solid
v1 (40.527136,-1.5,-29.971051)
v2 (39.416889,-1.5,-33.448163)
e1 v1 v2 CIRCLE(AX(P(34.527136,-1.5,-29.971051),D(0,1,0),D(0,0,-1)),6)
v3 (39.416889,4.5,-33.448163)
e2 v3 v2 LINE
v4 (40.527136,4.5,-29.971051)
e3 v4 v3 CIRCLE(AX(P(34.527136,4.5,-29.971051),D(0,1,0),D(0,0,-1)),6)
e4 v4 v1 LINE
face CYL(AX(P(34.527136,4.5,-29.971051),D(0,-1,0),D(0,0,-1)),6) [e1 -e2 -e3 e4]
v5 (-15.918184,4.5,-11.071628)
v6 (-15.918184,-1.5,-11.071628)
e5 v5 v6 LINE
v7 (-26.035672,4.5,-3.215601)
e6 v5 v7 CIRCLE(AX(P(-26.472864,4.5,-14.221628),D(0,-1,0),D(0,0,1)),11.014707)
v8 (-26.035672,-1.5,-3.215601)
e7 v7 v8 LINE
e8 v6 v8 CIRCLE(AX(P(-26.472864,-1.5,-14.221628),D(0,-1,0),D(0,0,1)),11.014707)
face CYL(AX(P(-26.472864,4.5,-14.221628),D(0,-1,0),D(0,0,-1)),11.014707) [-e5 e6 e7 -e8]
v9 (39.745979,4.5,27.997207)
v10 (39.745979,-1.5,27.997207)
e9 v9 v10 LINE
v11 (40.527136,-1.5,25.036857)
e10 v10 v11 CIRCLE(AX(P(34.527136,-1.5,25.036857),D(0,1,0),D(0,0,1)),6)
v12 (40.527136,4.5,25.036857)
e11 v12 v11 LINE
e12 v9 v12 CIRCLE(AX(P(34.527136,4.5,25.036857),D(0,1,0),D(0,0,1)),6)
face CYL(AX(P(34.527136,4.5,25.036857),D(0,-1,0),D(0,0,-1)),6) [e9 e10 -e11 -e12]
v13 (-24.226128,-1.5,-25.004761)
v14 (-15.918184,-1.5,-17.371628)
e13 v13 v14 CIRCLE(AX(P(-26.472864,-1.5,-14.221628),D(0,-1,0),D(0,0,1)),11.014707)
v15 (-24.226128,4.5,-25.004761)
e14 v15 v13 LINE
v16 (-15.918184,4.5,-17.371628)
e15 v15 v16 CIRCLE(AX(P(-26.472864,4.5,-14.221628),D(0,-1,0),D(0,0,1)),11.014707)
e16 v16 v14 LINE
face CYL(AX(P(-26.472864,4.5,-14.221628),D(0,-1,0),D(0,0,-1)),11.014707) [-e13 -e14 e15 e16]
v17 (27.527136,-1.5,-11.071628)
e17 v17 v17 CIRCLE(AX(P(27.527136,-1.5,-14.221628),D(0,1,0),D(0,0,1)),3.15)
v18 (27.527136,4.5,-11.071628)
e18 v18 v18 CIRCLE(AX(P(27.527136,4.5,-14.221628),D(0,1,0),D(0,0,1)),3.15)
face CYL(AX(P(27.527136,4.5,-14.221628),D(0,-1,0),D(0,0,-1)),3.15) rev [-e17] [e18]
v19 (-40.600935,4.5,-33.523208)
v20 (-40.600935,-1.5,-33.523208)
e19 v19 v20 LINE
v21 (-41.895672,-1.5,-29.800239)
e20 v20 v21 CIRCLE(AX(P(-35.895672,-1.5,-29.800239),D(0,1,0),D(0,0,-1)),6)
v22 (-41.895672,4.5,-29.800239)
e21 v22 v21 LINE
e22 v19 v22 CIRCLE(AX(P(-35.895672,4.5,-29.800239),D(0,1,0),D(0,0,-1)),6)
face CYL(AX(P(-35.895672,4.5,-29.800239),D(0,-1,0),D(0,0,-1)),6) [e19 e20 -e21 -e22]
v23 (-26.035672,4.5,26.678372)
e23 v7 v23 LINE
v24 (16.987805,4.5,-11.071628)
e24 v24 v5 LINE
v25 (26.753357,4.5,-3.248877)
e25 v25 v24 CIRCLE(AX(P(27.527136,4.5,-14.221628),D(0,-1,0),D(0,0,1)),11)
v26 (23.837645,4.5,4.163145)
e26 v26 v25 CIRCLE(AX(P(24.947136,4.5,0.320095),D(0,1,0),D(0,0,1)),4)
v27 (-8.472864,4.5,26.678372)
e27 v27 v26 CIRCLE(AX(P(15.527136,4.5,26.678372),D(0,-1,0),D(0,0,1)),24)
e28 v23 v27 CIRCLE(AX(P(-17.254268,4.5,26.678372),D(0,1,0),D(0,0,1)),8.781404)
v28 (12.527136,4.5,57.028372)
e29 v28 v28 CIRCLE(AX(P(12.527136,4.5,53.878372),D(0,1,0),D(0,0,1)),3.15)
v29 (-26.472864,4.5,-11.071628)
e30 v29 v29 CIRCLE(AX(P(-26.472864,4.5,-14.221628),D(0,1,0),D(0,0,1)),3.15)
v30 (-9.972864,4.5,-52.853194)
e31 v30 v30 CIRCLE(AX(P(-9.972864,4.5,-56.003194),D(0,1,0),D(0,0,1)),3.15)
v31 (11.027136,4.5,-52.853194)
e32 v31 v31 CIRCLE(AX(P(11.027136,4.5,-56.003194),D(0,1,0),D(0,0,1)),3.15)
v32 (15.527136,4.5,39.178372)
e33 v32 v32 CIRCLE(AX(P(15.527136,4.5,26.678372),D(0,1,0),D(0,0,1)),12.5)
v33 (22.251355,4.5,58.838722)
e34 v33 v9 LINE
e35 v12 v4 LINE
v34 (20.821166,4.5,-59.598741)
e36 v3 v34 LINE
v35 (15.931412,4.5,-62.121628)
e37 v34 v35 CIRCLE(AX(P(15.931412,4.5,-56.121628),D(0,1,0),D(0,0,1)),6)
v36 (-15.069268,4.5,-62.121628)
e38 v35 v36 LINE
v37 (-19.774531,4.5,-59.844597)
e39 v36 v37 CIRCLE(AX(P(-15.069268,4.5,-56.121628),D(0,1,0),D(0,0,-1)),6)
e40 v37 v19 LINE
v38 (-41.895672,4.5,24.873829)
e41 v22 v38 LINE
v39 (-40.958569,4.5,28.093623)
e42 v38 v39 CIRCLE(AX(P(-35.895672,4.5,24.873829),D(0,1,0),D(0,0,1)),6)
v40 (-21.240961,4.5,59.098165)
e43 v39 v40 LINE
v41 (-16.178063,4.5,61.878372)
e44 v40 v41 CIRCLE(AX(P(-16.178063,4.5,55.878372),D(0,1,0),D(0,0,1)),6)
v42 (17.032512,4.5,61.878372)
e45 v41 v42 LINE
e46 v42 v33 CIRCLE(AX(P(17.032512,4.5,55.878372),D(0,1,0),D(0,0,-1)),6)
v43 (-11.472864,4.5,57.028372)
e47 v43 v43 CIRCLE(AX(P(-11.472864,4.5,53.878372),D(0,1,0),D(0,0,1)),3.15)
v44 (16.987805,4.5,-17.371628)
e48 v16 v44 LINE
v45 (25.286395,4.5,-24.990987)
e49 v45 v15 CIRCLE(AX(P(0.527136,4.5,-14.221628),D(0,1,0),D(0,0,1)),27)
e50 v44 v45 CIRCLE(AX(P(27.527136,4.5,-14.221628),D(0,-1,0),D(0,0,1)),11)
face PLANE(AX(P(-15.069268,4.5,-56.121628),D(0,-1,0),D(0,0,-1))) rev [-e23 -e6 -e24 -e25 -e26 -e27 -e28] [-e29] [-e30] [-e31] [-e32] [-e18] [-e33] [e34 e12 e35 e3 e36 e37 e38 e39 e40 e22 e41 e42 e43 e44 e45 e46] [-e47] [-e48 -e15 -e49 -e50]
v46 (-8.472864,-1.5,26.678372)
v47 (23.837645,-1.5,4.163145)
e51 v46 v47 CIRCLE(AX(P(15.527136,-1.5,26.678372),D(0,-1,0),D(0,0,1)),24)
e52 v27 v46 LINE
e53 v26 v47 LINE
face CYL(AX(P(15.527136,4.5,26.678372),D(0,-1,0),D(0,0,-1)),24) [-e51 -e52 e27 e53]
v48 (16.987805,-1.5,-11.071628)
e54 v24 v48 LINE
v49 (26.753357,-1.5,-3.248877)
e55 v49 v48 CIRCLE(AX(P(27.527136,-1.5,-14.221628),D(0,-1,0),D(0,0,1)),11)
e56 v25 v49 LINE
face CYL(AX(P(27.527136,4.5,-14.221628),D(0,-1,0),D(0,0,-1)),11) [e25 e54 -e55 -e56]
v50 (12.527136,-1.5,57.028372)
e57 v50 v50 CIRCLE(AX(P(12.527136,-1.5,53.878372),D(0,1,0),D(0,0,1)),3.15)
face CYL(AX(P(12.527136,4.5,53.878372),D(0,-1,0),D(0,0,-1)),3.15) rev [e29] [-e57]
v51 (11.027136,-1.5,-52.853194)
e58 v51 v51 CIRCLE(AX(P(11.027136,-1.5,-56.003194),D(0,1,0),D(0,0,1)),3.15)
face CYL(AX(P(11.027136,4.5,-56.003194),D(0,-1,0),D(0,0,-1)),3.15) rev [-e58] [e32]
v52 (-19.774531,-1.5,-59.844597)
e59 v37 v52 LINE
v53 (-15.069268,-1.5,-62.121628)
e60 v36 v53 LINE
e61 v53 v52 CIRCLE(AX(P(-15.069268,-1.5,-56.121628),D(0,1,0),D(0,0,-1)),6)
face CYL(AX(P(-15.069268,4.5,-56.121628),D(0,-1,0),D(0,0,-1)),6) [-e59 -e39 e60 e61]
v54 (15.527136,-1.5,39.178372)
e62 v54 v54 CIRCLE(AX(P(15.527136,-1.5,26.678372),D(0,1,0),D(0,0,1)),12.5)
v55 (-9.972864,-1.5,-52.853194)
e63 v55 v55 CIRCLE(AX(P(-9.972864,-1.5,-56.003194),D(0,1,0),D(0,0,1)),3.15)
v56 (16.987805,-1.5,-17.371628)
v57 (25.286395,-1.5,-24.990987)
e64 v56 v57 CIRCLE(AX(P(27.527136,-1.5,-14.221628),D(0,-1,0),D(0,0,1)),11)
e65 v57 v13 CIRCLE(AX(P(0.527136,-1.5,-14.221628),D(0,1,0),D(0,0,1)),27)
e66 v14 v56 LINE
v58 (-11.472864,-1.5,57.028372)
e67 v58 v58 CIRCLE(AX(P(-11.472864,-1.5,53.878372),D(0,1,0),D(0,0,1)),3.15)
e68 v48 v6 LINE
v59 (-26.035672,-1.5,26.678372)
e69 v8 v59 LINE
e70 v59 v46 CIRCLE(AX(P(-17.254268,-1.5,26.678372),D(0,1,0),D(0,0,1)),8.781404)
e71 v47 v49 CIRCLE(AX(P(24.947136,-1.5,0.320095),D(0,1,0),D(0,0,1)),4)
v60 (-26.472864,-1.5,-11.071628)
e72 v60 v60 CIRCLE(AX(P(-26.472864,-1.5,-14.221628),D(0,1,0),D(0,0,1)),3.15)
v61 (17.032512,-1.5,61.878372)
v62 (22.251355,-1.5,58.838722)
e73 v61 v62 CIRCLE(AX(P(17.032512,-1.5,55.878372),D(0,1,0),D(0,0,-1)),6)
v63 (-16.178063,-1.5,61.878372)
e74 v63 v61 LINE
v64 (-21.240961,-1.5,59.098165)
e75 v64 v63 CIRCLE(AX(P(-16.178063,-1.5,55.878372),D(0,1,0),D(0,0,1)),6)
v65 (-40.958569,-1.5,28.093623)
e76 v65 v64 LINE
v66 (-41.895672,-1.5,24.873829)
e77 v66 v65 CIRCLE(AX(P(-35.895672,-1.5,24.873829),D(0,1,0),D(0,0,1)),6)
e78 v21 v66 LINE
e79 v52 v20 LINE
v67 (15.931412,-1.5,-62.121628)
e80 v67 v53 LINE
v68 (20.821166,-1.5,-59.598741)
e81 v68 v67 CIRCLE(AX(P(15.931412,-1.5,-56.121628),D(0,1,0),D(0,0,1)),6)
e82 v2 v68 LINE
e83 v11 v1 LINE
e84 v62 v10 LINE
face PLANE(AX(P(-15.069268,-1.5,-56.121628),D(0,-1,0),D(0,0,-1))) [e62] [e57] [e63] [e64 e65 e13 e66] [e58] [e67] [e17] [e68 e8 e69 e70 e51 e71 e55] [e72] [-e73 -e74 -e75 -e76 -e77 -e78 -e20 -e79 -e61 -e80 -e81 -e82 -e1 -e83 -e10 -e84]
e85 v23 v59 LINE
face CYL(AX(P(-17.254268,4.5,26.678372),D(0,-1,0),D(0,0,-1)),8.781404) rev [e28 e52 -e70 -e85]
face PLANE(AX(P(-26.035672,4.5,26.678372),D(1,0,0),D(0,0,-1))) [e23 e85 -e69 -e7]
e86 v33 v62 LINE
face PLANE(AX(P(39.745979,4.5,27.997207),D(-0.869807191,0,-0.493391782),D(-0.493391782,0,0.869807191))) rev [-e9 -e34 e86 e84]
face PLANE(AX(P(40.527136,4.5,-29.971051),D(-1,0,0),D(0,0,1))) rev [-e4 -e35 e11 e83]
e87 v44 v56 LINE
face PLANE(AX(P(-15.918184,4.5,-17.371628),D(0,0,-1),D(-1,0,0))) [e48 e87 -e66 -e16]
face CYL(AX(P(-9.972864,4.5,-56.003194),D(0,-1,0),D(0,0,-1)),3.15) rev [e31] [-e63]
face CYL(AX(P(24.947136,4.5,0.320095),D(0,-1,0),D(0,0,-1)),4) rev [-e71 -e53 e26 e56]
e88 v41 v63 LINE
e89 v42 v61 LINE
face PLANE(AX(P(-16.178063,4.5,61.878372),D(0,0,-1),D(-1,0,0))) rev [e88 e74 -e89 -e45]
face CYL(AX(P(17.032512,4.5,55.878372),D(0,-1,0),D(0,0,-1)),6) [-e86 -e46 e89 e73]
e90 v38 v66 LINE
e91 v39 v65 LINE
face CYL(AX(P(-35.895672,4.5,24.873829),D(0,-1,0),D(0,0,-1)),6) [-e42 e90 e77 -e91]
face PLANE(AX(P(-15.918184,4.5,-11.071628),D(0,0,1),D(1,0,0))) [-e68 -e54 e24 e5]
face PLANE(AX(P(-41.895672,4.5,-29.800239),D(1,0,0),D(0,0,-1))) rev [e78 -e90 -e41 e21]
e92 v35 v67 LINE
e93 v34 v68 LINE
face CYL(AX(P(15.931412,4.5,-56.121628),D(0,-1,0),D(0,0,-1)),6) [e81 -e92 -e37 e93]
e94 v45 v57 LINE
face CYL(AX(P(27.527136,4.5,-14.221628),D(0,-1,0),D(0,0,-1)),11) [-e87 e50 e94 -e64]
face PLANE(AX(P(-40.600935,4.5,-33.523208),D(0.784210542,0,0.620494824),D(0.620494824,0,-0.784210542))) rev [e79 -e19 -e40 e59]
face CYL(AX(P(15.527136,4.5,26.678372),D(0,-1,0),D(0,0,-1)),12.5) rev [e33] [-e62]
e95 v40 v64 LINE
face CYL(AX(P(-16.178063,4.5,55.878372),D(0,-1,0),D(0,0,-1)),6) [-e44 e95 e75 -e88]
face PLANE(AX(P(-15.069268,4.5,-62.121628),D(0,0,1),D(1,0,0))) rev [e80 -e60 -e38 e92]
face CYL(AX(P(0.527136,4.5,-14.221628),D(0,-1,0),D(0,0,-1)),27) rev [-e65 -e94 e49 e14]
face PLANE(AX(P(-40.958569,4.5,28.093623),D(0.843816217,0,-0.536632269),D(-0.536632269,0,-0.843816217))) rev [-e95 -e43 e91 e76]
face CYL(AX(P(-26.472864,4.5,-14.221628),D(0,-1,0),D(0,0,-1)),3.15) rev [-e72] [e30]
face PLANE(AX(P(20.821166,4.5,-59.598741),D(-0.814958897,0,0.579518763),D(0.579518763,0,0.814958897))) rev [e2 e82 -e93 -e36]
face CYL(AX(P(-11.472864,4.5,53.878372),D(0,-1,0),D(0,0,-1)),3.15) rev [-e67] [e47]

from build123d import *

# Parameters (mm, degrees)
SKETCH1_R          = 6.25
SKETCH1_R_2        = 1.575
BASE_FLANGE1_DEPTH = 3
L_EK1_SCALE        = 2


# Sheet-metal steps are written as plain solids
with BuildPart() as part:
    # Sketch1 → Base-Flange1 (new body)
    with BuildSketch(Plane(origin=(0, 0, 0), x_dir=(1, 0, 0), z_dir=(0, 1, 0))):
        with BuildLine():
            Line((19.609421573, -14.059417906), (10.862109445, -29.480175346))
            ThreePointArc((10.862109445, -29.480175346), (9.762567662, -30.59234701), (8.252687872, -31))
            Line((8.252687872, -31), (-8.352599575, -31))
            ThreePointArc((-8.352599575, -31), (-9.796606082, -30.629609326), (-10.884048227, -29.609896806))
            Line((-10.884048227, -29.609896806), (-20.742852548, -14.107625594))
            ThreePointArc((-20.742852548, -14.107625594), (-21.091885276, -13.336076582), (-21.211403896, -12.497728788))
            Line((-21.211403896, -12.497728788), (-21.211403896, 14.839305313))
            ThreePointArc((-21.211403896, 14.839305313), (-21.044943633, 15.824725306), (-20.564035521, 16.700789784))
            Line((-20.564035521, 16.700789784), (-10.150833328, 29.861484472))
            ThreePointArc((-10.150833328, 29.861484472), (-9.105019706, 30.700412322), (-7.798201703, 31))
            Line((-7.798201703, 31), (7.702138241, 31))
            ThreePointArc((7.702138241, 31), (9.077698333, 30.666052219), (10.147014932, 29.738556288))
            Line((10.147014932, 29.738556288), (19.444876691, 16.663267527))
            ThreePointArc((19.444876691, 16.663267527), (19.857851472, 15.837226972), (20, 14.924711239))
            Line((20, 14.924711239), (20, -12.57924256))
            ThreePointArc((20, -12.57924256), (19.900712388, -13.344662472), (19.609421573, -14.059417906))
        make_face()
        with Locations(Location((7.5, -13.4, 0), (0, 0, 270))):
            Circle(SKETCH1_R, mode=Mode.SUBTRACT)
        with Locations(Location((6, -27, 0), (0, 0, 270))):
            Circle(SKETCH1_R_2, mode=Mode.SUBTRACT)
        with Locations(Location((-6, -27, 0), (0, 0, 270))):
            Circle(SKETCH1_R_2, mode=Mode.SUBTRACT)
        with Locations(Location((5.25, 27.940782939, 0), (0, 0, 270))):
            Circle(SKETCH1_R_2, mode=Mode.SUBTRACT)
        with Locations(Location((-5.25, 27.940782939, 0), (0, 0, 270))):
            Circle(SKETCH1_R_2, mode=Mode.SUBTRACT)
        with Locations(Location((13.5, 7.05, 0), (0, 0, 270))):
            Circle(SKETCH1_R_2, mode=Mode.SUBTRACT)
        with Locations(Location((-13.5, 7.05, 0), (0, 0, 270))):
            Circle(SKETCH1_R_2, mode=Mode.SUBTRACT)
        with BuildLine():
            Line((-13.281403896, 0), (-13.281403896, 1.54698652))
            ThreePointArc((-13.281403896, 1.54698652), (-10.122330587, 2.700024029), (-8.222660082, 5.475))
            Line((-8.222660082, 5.475), (8.230334451, 5.475))
            ThreePointArc((8.230334451, 5.475), (10.061414817, 2.757432943), (13.113110627, 1.563624456))
            ThreePointArc((13.113110627, 1.563624456), (14.07117407, -0.953003234), (11.655254401, -2.142386538))
            ThreePointArc((11.655254401, -2.142386538), (0.639353267, -3.554619032), (-4.5, -13.4))
            ThreePointArc((-4.5, -13.4), (-8.890701948, -17.790701948), (-13.281403896, -13.4))
            Line((-13.281403896, -13.4), (-13.281403896, 0))
        make_face(mode=Mode.SUBTRACT)
        with BuildLine():
            Line((-8.222660082, 8.625), (8.230334451, 8.625))
            ThreePointArc((8.230334451, 8.625), (9.780248168, 11.101351171), (12.37962963, 12.434679214))
            ThreePointArc((12.37962963, 12.434679214), (0.003755557, 20.549999478), (-12.376631792, 12.441566144))
            ThreePointArc((-12.376631792, 12.441566144), (-9.773901449, 11.105506282), (-8.222660082, 8.625))
        make_face(mode=Mode.SUBTRACT)
    extrude(amount=BASE_FLANGE1_DEPTH)


with BuildPart() as part_1:
    # Ölçek1: scaled about (-0.5271359, 1.5, 0.12162837)
    add(part.part.scale(L_EK1_SCALE).moved(Location((0.5271359, -1.5, -0.12162837))))


solid = part_1.part
